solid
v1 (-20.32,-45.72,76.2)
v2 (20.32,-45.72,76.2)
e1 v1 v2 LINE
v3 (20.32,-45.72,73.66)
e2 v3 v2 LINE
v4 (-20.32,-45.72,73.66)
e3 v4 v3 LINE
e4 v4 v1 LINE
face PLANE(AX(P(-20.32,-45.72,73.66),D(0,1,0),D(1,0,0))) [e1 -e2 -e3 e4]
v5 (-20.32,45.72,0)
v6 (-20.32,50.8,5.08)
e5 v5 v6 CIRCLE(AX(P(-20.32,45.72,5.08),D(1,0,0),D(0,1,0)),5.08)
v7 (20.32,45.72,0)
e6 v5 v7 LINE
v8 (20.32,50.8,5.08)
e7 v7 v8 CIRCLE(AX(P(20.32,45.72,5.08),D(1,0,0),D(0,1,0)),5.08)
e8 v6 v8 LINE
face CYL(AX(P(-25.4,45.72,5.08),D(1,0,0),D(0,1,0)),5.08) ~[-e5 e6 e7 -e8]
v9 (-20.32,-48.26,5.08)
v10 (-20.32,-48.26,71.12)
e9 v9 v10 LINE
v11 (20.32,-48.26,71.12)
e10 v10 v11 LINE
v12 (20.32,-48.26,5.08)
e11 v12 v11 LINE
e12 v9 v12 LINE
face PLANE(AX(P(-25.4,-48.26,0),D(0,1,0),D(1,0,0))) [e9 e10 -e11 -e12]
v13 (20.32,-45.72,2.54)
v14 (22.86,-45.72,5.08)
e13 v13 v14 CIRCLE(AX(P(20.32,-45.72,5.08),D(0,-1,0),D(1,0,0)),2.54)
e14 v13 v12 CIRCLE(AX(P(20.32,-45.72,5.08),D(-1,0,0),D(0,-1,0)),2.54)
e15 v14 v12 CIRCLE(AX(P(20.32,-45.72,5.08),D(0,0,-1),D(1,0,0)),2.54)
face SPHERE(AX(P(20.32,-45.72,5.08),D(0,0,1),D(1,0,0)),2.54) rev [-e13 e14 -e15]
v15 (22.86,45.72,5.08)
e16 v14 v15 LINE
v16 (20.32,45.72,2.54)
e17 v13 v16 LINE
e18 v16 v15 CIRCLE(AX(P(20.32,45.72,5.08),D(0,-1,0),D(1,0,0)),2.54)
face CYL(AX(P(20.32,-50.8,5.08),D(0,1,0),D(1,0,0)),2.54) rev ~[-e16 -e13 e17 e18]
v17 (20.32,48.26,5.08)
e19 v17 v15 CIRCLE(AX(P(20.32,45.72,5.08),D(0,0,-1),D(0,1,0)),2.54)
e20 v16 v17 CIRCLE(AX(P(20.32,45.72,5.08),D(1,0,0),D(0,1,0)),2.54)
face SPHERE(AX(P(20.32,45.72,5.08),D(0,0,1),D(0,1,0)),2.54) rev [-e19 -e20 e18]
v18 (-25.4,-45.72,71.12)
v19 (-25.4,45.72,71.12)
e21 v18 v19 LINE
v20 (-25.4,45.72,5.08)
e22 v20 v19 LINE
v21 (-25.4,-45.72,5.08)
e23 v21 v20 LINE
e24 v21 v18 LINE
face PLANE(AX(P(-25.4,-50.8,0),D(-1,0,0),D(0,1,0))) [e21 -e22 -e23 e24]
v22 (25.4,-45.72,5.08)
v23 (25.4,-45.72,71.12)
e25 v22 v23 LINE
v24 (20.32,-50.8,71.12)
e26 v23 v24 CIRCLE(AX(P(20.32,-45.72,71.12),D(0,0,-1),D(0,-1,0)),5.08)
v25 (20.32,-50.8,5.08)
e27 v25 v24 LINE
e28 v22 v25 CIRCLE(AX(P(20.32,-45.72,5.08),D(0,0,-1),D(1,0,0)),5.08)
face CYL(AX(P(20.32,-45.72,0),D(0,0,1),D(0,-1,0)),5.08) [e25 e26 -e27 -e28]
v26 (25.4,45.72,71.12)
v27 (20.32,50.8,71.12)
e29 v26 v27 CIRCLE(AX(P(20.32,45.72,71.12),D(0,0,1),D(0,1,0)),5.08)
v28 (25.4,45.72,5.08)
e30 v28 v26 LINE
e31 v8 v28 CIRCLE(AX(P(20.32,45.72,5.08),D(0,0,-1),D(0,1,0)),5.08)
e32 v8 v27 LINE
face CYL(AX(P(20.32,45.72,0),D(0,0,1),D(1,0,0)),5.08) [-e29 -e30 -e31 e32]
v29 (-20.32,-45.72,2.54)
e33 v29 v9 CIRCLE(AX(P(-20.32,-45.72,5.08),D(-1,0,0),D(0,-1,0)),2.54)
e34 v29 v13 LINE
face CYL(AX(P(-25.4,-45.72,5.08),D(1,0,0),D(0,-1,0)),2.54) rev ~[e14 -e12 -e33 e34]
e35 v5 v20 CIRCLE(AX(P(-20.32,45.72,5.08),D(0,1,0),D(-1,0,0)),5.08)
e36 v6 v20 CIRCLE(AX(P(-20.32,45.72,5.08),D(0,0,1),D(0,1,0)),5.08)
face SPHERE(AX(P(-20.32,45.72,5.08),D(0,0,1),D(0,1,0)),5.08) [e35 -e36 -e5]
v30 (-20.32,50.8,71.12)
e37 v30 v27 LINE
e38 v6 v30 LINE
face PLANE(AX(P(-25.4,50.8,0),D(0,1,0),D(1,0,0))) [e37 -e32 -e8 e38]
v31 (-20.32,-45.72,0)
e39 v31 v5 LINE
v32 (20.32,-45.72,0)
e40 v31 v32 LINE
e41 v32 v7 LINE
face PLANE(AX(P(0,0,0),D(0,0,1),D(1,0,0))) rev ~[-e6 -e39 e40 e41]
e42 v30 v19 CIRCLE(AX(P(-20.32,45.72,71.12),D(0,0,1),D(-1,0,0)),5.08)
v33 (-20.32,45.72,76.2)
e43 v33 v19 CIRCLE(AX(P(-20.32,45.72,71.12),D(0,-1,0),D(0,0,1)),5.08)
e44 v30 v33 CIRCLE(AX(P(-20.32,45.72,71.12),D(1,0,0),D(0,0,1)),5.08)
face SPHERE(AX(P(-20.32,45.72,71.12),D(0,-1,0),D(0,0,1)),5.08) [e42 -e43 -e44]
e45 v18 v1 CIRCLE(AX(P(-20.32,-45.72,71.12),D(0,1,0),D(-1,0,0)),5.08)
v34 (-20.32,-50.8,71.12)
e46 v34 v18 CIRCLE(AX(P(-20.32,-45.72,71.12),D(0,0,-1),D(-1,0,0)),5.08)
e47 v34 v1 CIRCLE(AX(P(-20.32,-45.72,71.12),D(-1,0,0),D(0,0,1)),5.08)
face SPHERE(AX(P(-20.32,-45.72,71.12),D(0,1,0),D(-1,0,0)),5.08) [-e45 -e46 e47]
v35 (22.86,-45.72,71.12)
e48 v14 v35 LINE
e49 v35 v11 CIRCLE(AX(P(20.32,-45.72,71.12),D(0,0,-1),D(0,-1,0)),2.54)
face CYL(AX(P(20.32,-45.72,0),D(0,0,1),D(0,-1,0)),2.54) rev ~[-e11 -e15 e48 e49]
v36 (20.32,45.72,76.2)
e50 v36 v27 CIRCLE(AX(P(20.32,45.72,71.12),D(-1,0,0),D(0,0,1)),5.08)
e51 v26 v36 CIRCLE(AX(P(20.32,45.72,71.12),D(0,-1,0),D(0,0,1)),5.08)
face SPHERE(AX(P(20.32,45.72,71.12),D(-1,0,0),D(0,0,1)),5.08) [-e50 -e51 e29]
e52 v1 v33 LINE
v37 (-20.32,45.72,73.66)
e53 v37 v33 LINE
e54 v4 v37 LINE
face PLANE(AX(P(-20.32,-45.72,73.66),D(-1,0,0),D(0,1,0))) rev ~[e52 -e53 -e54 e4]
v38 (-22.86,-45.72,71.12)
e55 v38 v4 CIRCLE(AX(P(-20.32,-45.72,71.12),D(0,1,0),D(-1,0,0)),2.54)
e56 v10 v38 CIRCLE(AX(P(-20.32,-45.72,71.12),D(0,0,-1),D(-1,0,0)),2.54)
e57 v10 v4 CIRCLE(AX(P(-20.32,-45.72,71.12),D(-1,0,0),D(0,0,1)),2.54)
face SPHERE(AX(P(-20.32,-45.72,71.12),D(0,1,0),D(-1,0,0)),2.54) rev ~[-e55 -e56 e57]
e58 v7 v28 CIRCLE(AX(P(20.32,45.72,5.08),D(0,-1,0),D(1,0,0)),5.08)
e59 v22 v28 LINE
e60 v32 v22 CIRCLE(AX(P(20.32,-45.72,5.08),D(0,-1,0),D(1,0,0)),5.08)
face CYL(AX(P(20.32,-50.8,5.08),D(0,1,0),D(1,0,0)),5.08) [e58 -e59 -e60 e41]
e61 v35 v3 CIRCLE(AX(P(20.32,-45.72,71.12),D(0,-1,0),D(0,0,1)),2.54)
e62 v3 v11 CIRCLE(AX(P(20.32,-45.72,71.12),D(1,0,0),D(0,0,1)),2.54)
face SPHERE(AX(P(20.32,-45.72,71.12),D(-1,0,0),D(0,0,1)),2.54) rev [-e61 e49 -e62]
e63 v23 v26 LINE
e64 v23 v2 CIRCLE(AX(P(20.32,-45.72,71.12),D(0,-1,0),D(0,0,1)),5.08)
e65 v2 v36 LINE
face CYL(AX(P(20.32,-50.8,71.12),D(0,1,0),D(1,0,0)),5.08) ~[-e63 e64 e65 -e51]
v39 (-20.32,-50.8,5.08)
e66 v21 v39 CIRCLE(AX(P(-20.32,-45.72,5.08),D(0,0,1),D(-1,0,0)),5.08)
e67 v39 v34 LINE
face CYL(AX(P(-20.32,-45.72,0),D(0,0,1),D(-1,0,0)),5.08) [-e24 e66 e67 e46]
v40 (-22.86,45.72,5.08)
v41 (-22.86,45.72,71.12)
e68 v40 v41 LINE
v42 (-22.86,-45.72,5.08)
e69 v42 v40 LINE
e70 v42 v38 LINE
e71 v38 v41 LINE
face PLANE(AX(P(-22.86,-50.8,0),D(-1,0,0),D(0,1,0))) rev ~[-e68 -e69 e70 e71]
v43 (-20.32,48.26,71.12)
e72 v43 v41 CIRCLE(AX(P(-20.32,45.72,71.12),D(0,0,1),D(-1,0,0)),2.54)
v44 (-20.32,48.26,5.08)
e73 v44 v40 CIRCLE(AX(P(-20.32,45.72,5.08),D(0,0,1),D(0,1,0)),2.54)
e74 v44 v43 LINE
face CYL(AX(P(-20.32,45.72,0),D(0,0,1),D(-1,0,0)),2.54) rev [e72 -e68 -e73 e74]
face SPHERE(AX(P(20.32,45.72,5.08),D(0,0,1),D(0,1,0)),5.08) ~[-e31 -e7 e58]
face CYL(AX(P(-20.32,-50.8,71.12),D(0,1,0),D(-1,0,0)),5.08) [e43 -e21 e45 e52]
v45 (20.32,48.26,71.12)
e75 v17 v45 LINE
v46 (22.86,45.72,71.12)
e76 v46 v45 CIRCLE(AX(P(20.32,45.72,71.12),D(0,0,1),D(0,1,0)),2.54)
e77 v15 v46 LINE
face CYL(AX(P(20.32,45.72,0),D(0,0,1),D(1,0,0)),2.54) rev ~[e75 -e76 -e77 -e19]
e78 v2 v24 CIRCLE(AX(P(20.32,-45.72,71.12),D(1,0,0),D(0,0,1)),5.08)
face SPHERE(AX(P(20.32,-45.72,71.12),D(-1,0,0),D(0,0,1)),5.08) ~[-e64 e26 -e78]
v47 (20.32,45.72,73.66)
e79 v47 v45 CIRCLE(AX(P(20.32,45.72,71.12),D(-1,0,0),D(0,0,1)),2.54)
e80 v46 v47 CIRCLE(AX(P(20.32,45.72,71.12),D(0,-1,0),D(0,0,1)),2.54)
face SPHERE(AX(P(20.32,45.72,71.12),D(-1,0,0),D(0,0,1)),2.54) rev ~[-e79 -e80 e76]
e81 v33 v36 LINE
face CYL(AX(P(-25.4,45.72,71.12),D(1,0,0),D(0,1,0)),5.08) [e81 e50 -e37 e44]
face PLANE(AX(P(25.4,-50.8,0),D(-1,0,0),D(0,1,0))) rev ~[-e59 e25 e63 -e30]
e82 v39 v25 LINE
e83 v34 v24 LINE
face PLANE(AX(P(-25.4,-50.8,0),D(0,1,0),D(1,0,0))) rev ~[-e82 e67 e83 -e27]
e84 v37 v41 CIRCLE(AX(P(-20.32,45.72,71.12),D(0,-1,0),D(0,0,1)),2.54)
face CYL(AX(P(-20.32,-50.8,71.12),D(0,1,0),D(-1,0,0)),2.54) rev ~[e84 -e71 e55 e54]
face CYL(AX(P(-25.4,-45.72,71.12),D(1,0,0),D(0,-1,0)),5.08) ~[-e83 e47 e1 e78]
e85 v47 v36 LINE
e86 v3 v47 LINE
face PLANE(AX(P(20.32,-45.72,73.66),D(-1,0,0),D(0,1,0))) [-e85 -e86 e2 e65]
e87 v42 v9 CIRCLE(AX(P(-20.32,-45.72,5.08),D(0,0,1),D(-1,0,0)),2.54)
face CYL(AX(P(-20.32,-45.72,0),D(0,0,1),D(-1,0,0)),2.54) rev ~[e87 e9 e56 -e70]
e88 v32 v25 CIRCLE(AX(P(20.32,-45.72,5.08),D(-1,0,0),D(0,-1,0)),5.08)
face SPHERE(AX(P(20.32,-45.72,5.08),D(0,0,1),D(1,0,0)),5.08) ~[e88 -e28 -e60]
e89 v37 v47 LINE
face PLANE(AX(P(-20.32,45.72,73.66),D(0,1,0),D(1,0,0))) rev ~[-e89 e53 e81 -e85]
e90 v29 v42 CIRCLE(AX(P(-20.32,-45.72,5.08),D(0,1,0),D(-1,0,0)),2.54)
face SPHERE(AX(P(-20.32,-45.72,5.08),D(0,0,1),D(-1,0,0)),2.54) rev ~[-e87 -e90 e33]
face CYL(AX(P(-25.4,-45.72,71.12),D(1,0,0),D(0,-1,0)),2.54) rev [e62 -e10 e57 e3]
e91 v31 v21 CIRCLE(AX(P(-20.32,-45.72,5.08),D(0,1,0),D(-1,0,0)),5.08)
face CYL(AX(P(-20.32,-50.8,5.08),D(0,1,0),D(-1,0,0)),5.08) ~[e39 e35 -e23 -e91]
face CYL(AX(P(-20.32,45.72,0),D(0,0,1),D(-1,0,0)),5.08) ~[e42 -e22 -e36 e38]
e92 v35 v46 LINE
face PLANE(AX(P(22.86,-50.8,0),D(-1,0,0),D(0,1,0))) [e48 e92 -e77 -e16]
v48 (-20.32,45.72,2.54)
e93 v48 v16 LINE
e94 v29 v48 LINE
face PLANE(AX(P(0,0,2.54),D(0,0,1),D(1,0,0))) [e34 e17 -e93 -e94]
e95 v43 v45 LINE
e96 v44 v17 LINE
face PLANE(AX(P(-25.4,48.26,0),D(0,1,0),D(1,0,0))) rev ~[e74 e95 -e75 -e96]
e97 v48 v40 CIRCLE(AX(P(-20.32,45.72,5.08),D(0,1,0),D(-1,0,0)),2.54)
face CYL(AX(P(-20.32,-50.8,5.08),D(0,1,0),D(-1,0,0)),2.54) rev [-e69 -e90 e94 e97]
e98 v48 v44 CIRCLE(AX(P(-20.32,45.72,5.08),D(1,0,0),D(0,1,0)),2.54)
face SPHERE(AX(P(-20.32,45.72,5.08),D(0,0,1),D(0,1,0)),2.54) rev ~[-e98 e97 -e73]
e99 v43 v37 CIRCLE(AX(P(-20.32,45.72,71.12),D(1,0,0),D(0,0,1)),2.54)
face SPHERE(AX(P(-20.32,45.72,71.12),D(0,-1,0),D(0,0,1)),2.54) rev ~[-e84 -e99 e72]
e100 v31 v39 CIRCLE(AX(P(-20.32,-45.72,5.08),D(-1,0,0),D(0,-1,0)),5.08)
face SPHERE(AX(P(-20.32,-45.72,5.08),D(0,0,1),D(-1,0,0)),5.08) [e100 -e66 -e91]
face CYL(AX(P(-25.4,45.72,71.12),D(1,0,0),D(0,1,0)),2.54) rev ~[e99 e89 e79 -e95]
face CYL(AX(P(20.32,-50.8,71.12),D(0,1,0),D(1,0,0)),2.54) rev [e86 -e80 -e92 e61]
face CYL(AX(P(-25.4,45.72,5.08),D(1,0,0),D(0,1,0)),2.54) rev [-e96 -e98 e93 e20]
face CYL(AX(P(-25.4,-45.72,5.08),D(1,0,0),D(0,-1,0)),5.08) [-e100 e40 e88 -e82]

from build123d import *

# Parameters (mm, degrees)
F0_W     = 50.8
F0_H     = 101.6
F1_DEPTH = 76.2
F2_R     = 5.08
F3_T     = -2.54


# Not quite as in the source:
# - a shell that OpenCascade refuses in one call is made with other operations: the cavity is built on its own and cut out


with BuildPart() as f1:
    # F0 (on Top) → F1 (new body)
    with BuildSketch(Plane.XY):
        Rectangle(F0_W, F0_H)
    extrude(amount=F1_DEPTH)

    # F2
    f2_edges = [f1.edges().sort_by_distance(p)[0] for p in [
        (-25.4, 0, 76.2),
        (0, 50.8, 76.2),
        (-25.4, 50.8, 38.1),
        (-25.4, -50.8, 38.1),
        (0, -50.8, 76.2),
        (25.4, 0, 76.2),
        (25.4, -50.8, 38.1),
        (25.4, 50.8, 38.1),
        (0, 50.8, 0),
        (25.4, 0, 0),
        (-25.4, 0, 0),
        (0, -50.8, 0),
    ]]
    fillet(f2_edges, radius=F2_R)

    # F3: a shell. OpenCascade refuses it in one call, so the cavity is built on its own and cut out:
    # the body offset inwards by the wall thickness, plus a prism from it out through each open face.
    f3_core = offset(f1.part, amount=F3_T, mode=Mode.PRIVATE)
    f3_exits = [f3_core.faces().sort_by_distance(p)[0] for p in [
        (0, 0, 73.66),
    ]]
    add(f3_core, mode=Mode.SUBTRACT)
    extrude(f3_exits, amount=-F3_T, mode=Mode.SUBTRACT)


solid = f1.part
